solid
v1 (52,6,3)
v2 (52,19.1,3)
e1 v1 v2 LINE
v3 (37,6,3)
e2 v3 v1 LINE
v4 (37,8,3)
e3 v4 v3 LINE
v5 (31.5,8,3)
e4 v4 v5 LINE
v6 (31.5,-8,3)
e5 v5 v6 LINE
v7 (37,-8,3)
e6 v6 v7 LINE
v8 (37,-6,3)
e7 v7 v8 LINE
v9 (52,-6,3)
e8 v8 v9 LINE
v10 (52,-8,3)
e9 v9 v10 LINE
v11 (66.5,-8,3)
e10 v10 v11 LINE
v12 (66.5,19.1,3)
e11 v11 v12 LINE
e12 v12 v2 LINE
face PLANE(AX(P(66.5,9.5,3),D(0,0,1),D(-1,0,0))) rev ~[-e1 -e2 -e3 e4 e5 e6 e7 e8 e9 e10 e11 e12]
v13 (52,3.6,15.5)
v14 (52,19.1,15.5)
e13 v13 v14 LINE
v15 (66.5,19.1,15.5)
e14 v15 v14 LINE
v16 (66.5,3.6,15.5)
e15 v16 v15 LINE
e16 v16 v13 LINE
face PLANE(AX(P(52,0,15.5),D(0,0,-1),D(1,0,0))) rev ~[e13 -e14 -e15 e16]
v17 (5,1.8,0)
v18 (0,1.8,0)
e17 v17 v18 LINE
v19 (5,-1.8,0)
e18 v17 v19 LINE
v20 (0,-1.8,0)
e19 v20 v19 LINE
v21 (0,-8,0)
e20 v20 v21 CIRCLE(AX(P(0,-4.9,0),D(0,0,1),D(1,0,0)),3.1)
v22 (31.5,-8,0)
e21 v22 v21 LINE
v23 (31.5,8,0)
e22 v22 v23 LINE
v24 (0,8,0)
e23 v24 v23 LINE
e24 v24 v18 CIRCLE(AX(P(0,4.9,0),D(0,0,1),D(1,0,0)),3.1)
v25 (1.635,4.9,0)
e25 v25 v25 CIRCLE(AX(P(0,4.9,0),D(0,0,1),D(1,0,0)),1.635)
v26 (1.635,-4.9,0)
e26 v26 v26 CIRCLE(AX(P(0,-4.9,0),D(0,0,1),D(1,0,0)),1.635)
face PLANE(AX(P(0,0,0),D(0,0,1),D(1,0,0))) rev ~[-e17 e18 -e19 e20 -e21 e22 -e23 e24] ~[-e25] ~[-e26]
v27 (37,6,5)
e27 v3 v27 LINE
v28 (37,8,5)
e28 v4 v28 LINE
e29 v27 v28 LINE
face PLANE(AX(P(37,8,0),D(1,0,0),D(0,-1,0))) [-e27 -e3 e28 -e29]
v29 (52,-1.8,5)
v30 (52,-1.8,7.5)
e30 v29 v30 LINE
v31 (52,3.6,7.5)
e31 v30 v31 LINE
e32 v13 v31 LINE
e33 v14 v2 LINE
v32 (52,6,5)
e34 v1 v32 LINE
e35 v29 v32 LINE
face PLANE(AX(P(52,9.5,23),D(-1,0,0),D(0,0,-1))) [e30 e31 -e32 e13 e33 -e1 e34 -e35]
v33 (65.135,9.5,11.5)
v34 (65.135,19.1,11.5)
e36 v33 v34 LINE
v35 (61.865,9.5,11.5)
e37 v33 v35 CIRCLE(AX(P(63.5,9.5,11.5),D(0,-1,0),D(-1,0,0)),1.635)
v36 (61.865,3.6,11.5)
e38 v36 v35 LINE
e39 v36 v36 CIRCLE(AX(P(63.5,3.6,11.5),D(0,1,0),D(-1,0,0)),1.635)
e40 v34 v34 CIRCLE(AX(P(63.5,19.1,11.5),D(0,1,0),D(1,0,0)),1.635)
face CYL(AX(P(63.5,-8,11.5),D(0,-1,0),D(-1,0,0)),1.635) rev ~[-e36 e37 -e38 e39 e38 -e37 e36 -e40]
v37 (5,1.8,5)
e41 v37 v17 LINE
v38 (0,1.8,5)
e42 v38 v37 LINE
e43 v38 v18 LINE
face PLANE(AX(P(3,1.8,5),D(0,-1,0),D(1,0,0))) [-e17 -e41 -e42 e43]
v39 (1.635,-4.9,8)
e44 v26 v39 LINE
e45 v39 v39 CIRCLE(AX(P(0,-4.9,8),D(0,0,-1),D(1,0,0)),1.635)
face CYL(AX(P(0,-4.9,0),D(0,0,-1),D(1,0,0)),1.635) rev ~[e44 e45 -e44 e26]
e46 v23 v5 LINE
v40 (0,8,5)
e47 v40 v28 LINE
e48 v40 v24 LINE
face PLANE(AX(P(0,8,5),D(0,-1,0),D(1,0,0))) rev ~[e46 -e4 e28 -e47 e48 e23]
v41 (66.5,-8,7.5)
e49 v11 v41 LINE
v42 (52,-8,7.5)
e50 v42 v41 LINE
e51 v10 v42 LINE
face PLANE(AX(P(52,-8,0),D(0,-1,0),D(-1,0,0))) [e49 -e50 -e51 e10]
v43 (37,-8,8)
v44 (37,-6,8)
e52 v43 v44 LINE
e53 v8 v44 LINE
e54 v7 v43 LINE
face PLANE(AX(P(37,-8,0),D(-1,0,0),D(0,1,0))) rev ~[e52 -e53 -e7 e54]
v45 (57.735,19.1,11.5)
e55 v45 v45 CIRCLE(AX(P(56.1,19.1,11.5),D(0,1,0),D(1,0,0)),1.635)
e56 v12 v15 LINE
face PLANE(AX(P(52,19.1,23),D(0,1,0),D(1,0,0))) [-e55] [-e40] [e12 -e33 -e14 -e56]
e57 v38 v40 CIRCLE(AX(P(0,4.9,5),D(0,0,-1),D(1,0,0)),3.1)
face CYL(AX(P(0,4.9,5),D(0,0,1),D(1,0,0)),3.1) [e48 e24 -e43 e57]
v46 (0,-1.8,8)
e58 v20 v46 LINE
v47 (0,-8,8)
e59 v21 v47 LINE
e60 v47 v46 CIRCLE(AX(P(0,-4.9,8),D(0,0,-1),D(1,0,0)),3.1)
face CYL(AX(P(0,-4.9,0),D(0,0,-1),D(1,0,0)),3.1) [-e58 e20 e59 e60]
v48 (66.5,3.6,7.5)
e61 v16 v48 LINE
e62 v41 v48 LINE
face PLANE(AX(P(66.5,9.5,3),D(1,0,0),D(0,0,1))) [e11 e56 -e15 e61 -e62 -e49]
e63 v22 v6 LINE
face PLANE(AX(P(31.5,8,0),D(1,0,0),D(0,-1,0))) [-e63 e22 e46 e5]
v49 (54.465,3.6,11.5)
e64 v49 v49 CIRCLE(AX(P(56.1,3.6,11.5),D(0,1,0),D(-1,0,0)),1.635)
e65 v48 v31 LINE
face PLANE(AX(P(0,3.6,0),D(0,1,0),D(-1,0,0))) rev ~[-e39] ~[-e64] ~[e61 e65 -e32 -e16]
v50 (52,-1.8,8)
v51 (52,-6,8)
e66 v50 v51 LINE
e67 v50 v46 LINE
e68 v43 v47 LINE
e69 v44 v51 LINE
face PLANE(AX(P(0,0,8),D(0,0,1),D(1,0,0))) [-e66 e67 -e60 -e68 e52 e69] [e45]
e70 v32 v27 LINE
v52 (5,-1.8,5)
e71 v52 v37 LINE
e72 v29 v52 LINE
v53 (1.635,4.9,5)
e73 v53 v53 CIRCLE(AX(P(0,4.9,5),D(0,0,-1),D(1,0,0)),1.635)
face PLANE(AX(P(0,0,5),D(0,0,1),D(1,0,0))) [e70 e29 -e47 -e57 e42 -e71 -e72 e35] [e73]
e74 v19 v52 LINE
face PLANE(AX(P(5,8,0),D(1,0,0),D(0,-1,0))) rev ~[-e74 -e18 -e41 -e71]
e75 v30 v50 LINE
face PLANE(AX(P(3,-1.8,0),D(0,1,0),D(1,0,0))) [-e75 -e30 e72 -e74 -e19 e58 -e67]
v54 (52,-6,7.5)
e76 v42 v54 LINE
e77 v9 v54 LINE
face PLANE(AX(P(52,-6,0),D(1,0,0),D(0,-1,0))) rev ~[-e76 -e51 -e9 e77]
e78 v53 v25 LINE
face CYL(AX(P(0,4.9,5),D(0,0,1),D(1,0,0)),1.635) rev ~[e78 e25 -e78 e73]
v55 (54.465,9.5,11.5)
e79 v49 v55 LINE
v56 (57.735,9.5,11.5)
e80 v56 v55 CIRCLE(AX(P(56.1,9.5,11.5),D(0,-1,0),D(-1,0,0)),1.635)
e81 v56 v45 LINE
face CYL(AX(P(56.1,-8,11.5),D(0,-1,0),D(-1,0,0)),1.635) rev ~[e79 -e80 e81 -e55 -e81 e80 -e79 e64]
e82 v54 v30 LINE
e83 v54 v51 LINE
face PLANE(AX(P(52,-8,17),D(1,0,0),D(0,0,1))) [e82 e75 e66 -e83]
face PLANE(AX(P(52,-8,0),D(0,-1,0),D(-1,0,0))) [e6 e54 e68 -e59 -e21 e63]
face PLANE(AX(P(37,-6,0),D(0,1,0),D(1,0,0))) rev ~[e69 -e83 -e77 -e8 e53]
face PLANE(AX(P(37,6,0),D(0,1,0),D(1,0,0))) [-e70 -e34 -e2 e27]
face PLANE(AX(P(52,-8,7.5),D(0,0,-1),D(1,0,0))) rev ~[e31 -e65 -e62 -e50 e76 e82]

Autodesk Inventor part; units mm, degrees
ref_plane "YZ Plane" through (0, 0, 0) normal (1, 0, 0) x (0, 1, 0)
ref_plane "XZ Plane" through (0, 0, 0) normal (0, 1, 0) x (-1, 0, 0)
sketch "スケッチ1" plane through (0, 0, 0) normal (0, 0, 1) x (1, 0, 0)
  line L0 (-3, 8) -> (3, 8)
  line L1 (3, 8) -> (3, -8)
  line L2 (3, -8) -> (-3, -8)
  line L3 (-3, -8) -> (-3, 8)
  line L4 (-3, 8) -> (3, -8) construction
  line L5 (3, 8) -> (-3, -8) construction
  line L6 (0, 8) -> (0, -8) construction
  circle A0 centre (0, 4.9) radius 1.635
  circle A1 centre (0, -4.9) radius 1.635
  line L7 (0, 4.9) -> (0, -4.9)
  line L8 (-3, 0) -> (3, 0)
  circle A2 centre (0, 4.9) radius 3.1
  circle A3 centre (0, -4.9) radius 3.1
  line L9 (3, 8) -> (52, 8)
  line L10 (52, 8) -> (52, -8)
  line L11 (52, -8) -> (3, -8)
  line L12 (0, 1.8) -> (52, 1.8)
  line L13 (0, -1.8) -> (52, -1.8)
  line L14 (5, 8) -> (5, -8)
  point P0 (0, 0)
  point P1 (0, 0)
  point P2 (3, 1.8)
  point P3 (3, -1.8)
  dimension "d0" = 3.27
  dimension "d1" = 16
  dimension "d2" = 9.8
  dimension "d3" = 6
  dimension "d11" = 2
  dimension "d12" = 47
extrude "押し出し1" add sketch "スケッチ1" along normal blind 8 contours A3 L1 L3 | L3 A3 | A3 L1
ref_plane "作業平面1" through (0, 0, 5) normal (0, 0, -1) x (-1, 0, 0)
extrude "押し出し2" add sketch "スケッチ1" against normal blind 5 from surface at 5 contours A2 L1 L3 | L3 A2 | A2 L1
extrude "押し出し3" add sketch "スケッチ1" along normal up to surface (5 mm away) contours L9 L10 L12 L14 | L12 L10 L13 L14 | L13 L10 L11 L14
extrude "押し出し4" add sketch "スケッチ1" against normal up to surface (5 mm away) from surface at 5 contours L0 L1 A2 | L9 L14 L12 L1 A2 | L9 L10 L12 L14 | L1 L12 A2
extrude "押し出し5" add sketch "スケッチ1" along normal up to surface (8 mm away) contours L14 L11 L1 A3 L13 | L13 L10 L11 L14 | L13 L1 A3 | A3 L1 L2
sketch "スケッチ2" plane through (0, 0, 0) normal (0, 1, 0) x (-1, 0, 0)
  line L0 (-52, 0) -> (-52, 5) construction
  line L1 (-52, 23) -> (-66.5, 23)
  line L2 (-66.5, 23) -> (-66.5, 0)
  line L3 (-66.5, 0) -> (-52, 0)
  line L4 (-52, 0) -> (-52, 23)
  line L5 (-66.5, 11.5) -> (-52, 11.5) construction
  line L6 (-52, 17) -> (-66.5, 17)
  line L7 (-66.5, 17) -> (-66.5, 6)
  line L8 (-66.5, 6) -> (-52, 6)
  line L9 (-52, 6) -> (-52, 17)
  line L10 (-52, 17) -> (-66.5, 6) construction
  line L11 (-66.5, 17) -> (-52, 6) construction
  circle A0 centre (-56.1, 11.5) radius 1.635
  circle A1 centre (-63.5, 11.5) radius 1.635
  line L12 (-52, 15) -> (-66.5, 15) construction
  line L13 (-52, 0) -> (-5, 0) construction
  line L14 (-52, 0) -> (-52, 5) construction
  line L15 (0, 8) -> (-52, 8) construction
  line L16 (-52, 7.5) -> (-66.5, 7.5)
  line L17 (-53.1, 6) -> (-53.1, 17)
  line L18 (-59.25, 0) -> (-59.25, 23) construction
  line L19 (-52, 15.5) -> (-66.5, 15.5)
  line L20 (-65.4, 6) -> (-65.4, 17)
  line L21 (-53.1, 7.5) -> (-53.1, 15.5)
  point P0 (-59.25, 11.5)
  point P1 (-66.5, 17)
  point P2 (-65.4, 15.5)
  point P3 (-65.4, 7.5)
  point P4 (-66.5, 15.5)
  point P5 (-66.5, 7.5)
  point P6 (-52, 7.5)
  point P7 (-52, 15.5)
  dimension "d24" = 11
  dimension "d25" = 3.27
  dimension "d26" = 4.1
  dimension "d27" = 11.5
  dimension "d32" = 3.5
  dimension "d33" = 14.5
  dimension "d36" = 3.5
  dimension "d37" = 3
  dimension "d38" = 4
extrude "押し出し7" add sketch "スケッチ2" along normal blind 30 from surface at -8
extrude "押し出し8" cut sketch "スケッチ2" against normal blind 12.5 from surface at 22 contours L4 L6 L2 L1 | L4 L19 L17 L6 | L6 L20 L19 L2 | L4 L16 L17 L19 | L17 L19 L20 L6 | L19 L20 L16 L2 | L4 L8 L17 L16 | L17 L16 L20 L19 | L16 L20 L8 L2 | L4 L3 L2 L8 | L17 L8 L20 L16 | A0 | A1
extrude "押し出し10" cut sketch "スケッチ2" along normal blind 11.6 from surface at -8 contours L4 L6 L2 L1 | L4 L19 L17 L6 | L6 L20 L19 L2 | L4 L16 L17 L19 | L17 L19 L20 L6 | L19 L20 L16 L2 | L17 L16 L20 L19
sketch "スケッチ4" plane through (0, 0, 0) normal (0, 0, -1) x (-1, 0, 0)
  circle A0 centre (0, 4.9) radius 1.635 projected
  circle A1 centre (0, -4.9) radius 1.635 projected
  line L0 (-52, 8) -> (-52, 9.5) projected
  line L1 (-52, 9.5) -> (-66.5, 9.5) projected
  line L2 (-66.5, -8) -> (-66.5, 9.5) projected
  line L3 (0, -8) -> (-66.5, -8) projected
  arc A2 (0, -8) -> (0, -1.8) centre (0, -4.9) ccw projected
  line L4 (-5, -1.8) -> (0, -1.8) projected
  line L5 (-5, 1.8) -> (-5, -1.8) projected
  line L6 (0, 1.8) -> (-5, 1.8) projected
  arc A3 (0, 1.8) -> (0, 8) centre (0, 4.9) ccw projected
  line L7 (-52, 8) -> (0, 8) projected
  line L8 (-52, 8) -> (-66.5, 8)
  line L9 (0, 0) -> (-66.5, 0) construction
  line L10 (-66.5, 8) -> (-31.5, 8)
  line L11 (-31.5, 8) -> (-31.5, -15)
  line L12 (-31.5, -15) -> (-66.5, -15)
  line L13 (-66.5, -15) -> (-66.5, 8)
  line L14 (-52, 8) -> (-37, 8)
  line L15 (-37, 8) -> (-37, 6)
  line L16 (-37, 6) -> (-52, 6)
  line L17 (-52, 6) -> (-52, 8)
  line L18 (-37, -8) -> (-37, -6)
  line L19 (-37, -6) -> (-52, -6)
  line L20 (-52, -6) -> (-52, -8)
  point P0 (-31.5, 8)
  point P1 (-37, 8)
  point P2 (-52, -8)
  point P3 (-37, -8)
  dimension "d41" = 35
  dimension "d42" = 23
  dimension "d43" = 15
  dimension "d44" = 2
extrude "押し出し11" cut sketch "スケッチ4" against normal blind 3 contours L8 L2 L1 L0 | L17 L16 L15 L7 L11 L3 L18 L19 L20 L2 L8 | L7 L15 L16 L17 | L3 L11 L12 L13 | L20 L19 L18 L3
extrude "押し出し12" cut sketch "スケッチ4" against normal up to surface (8 mm away) contours L7 L15 L16 L17 | L20 L19 L18 L3
sketch "スケッチ5" plane through (52, 9.5, 23) normal (0, 1, 0) x (1, 0, 0)
  circle A0 centre (11.5, 11.5) radius 1.635 projected
  circle A1 centre (4.1, 11.5) radius 1.635 projected
  line L0 (14.5, 20) -> (0, 20) projected
  line L1 (0, 0) -> (0, 20) projected
  line L2 (14.5, 0) -> (0, 0) projected
  line L3 (14.5, 20) -> (14.5, 0) projected
  point P0 (-52, 23)
extrude "押し出し13" add sketch "スケッチ5" along normal blind 9.6
extrude "押し出し14" cut sketch "スケッチ2" along normal through all contours L4 L6 L2 L1 | L4 L19 L17 L6 | L6 L20 L19 L2 | L17 L19 L20 L6
properties part number "link_arm_5"
